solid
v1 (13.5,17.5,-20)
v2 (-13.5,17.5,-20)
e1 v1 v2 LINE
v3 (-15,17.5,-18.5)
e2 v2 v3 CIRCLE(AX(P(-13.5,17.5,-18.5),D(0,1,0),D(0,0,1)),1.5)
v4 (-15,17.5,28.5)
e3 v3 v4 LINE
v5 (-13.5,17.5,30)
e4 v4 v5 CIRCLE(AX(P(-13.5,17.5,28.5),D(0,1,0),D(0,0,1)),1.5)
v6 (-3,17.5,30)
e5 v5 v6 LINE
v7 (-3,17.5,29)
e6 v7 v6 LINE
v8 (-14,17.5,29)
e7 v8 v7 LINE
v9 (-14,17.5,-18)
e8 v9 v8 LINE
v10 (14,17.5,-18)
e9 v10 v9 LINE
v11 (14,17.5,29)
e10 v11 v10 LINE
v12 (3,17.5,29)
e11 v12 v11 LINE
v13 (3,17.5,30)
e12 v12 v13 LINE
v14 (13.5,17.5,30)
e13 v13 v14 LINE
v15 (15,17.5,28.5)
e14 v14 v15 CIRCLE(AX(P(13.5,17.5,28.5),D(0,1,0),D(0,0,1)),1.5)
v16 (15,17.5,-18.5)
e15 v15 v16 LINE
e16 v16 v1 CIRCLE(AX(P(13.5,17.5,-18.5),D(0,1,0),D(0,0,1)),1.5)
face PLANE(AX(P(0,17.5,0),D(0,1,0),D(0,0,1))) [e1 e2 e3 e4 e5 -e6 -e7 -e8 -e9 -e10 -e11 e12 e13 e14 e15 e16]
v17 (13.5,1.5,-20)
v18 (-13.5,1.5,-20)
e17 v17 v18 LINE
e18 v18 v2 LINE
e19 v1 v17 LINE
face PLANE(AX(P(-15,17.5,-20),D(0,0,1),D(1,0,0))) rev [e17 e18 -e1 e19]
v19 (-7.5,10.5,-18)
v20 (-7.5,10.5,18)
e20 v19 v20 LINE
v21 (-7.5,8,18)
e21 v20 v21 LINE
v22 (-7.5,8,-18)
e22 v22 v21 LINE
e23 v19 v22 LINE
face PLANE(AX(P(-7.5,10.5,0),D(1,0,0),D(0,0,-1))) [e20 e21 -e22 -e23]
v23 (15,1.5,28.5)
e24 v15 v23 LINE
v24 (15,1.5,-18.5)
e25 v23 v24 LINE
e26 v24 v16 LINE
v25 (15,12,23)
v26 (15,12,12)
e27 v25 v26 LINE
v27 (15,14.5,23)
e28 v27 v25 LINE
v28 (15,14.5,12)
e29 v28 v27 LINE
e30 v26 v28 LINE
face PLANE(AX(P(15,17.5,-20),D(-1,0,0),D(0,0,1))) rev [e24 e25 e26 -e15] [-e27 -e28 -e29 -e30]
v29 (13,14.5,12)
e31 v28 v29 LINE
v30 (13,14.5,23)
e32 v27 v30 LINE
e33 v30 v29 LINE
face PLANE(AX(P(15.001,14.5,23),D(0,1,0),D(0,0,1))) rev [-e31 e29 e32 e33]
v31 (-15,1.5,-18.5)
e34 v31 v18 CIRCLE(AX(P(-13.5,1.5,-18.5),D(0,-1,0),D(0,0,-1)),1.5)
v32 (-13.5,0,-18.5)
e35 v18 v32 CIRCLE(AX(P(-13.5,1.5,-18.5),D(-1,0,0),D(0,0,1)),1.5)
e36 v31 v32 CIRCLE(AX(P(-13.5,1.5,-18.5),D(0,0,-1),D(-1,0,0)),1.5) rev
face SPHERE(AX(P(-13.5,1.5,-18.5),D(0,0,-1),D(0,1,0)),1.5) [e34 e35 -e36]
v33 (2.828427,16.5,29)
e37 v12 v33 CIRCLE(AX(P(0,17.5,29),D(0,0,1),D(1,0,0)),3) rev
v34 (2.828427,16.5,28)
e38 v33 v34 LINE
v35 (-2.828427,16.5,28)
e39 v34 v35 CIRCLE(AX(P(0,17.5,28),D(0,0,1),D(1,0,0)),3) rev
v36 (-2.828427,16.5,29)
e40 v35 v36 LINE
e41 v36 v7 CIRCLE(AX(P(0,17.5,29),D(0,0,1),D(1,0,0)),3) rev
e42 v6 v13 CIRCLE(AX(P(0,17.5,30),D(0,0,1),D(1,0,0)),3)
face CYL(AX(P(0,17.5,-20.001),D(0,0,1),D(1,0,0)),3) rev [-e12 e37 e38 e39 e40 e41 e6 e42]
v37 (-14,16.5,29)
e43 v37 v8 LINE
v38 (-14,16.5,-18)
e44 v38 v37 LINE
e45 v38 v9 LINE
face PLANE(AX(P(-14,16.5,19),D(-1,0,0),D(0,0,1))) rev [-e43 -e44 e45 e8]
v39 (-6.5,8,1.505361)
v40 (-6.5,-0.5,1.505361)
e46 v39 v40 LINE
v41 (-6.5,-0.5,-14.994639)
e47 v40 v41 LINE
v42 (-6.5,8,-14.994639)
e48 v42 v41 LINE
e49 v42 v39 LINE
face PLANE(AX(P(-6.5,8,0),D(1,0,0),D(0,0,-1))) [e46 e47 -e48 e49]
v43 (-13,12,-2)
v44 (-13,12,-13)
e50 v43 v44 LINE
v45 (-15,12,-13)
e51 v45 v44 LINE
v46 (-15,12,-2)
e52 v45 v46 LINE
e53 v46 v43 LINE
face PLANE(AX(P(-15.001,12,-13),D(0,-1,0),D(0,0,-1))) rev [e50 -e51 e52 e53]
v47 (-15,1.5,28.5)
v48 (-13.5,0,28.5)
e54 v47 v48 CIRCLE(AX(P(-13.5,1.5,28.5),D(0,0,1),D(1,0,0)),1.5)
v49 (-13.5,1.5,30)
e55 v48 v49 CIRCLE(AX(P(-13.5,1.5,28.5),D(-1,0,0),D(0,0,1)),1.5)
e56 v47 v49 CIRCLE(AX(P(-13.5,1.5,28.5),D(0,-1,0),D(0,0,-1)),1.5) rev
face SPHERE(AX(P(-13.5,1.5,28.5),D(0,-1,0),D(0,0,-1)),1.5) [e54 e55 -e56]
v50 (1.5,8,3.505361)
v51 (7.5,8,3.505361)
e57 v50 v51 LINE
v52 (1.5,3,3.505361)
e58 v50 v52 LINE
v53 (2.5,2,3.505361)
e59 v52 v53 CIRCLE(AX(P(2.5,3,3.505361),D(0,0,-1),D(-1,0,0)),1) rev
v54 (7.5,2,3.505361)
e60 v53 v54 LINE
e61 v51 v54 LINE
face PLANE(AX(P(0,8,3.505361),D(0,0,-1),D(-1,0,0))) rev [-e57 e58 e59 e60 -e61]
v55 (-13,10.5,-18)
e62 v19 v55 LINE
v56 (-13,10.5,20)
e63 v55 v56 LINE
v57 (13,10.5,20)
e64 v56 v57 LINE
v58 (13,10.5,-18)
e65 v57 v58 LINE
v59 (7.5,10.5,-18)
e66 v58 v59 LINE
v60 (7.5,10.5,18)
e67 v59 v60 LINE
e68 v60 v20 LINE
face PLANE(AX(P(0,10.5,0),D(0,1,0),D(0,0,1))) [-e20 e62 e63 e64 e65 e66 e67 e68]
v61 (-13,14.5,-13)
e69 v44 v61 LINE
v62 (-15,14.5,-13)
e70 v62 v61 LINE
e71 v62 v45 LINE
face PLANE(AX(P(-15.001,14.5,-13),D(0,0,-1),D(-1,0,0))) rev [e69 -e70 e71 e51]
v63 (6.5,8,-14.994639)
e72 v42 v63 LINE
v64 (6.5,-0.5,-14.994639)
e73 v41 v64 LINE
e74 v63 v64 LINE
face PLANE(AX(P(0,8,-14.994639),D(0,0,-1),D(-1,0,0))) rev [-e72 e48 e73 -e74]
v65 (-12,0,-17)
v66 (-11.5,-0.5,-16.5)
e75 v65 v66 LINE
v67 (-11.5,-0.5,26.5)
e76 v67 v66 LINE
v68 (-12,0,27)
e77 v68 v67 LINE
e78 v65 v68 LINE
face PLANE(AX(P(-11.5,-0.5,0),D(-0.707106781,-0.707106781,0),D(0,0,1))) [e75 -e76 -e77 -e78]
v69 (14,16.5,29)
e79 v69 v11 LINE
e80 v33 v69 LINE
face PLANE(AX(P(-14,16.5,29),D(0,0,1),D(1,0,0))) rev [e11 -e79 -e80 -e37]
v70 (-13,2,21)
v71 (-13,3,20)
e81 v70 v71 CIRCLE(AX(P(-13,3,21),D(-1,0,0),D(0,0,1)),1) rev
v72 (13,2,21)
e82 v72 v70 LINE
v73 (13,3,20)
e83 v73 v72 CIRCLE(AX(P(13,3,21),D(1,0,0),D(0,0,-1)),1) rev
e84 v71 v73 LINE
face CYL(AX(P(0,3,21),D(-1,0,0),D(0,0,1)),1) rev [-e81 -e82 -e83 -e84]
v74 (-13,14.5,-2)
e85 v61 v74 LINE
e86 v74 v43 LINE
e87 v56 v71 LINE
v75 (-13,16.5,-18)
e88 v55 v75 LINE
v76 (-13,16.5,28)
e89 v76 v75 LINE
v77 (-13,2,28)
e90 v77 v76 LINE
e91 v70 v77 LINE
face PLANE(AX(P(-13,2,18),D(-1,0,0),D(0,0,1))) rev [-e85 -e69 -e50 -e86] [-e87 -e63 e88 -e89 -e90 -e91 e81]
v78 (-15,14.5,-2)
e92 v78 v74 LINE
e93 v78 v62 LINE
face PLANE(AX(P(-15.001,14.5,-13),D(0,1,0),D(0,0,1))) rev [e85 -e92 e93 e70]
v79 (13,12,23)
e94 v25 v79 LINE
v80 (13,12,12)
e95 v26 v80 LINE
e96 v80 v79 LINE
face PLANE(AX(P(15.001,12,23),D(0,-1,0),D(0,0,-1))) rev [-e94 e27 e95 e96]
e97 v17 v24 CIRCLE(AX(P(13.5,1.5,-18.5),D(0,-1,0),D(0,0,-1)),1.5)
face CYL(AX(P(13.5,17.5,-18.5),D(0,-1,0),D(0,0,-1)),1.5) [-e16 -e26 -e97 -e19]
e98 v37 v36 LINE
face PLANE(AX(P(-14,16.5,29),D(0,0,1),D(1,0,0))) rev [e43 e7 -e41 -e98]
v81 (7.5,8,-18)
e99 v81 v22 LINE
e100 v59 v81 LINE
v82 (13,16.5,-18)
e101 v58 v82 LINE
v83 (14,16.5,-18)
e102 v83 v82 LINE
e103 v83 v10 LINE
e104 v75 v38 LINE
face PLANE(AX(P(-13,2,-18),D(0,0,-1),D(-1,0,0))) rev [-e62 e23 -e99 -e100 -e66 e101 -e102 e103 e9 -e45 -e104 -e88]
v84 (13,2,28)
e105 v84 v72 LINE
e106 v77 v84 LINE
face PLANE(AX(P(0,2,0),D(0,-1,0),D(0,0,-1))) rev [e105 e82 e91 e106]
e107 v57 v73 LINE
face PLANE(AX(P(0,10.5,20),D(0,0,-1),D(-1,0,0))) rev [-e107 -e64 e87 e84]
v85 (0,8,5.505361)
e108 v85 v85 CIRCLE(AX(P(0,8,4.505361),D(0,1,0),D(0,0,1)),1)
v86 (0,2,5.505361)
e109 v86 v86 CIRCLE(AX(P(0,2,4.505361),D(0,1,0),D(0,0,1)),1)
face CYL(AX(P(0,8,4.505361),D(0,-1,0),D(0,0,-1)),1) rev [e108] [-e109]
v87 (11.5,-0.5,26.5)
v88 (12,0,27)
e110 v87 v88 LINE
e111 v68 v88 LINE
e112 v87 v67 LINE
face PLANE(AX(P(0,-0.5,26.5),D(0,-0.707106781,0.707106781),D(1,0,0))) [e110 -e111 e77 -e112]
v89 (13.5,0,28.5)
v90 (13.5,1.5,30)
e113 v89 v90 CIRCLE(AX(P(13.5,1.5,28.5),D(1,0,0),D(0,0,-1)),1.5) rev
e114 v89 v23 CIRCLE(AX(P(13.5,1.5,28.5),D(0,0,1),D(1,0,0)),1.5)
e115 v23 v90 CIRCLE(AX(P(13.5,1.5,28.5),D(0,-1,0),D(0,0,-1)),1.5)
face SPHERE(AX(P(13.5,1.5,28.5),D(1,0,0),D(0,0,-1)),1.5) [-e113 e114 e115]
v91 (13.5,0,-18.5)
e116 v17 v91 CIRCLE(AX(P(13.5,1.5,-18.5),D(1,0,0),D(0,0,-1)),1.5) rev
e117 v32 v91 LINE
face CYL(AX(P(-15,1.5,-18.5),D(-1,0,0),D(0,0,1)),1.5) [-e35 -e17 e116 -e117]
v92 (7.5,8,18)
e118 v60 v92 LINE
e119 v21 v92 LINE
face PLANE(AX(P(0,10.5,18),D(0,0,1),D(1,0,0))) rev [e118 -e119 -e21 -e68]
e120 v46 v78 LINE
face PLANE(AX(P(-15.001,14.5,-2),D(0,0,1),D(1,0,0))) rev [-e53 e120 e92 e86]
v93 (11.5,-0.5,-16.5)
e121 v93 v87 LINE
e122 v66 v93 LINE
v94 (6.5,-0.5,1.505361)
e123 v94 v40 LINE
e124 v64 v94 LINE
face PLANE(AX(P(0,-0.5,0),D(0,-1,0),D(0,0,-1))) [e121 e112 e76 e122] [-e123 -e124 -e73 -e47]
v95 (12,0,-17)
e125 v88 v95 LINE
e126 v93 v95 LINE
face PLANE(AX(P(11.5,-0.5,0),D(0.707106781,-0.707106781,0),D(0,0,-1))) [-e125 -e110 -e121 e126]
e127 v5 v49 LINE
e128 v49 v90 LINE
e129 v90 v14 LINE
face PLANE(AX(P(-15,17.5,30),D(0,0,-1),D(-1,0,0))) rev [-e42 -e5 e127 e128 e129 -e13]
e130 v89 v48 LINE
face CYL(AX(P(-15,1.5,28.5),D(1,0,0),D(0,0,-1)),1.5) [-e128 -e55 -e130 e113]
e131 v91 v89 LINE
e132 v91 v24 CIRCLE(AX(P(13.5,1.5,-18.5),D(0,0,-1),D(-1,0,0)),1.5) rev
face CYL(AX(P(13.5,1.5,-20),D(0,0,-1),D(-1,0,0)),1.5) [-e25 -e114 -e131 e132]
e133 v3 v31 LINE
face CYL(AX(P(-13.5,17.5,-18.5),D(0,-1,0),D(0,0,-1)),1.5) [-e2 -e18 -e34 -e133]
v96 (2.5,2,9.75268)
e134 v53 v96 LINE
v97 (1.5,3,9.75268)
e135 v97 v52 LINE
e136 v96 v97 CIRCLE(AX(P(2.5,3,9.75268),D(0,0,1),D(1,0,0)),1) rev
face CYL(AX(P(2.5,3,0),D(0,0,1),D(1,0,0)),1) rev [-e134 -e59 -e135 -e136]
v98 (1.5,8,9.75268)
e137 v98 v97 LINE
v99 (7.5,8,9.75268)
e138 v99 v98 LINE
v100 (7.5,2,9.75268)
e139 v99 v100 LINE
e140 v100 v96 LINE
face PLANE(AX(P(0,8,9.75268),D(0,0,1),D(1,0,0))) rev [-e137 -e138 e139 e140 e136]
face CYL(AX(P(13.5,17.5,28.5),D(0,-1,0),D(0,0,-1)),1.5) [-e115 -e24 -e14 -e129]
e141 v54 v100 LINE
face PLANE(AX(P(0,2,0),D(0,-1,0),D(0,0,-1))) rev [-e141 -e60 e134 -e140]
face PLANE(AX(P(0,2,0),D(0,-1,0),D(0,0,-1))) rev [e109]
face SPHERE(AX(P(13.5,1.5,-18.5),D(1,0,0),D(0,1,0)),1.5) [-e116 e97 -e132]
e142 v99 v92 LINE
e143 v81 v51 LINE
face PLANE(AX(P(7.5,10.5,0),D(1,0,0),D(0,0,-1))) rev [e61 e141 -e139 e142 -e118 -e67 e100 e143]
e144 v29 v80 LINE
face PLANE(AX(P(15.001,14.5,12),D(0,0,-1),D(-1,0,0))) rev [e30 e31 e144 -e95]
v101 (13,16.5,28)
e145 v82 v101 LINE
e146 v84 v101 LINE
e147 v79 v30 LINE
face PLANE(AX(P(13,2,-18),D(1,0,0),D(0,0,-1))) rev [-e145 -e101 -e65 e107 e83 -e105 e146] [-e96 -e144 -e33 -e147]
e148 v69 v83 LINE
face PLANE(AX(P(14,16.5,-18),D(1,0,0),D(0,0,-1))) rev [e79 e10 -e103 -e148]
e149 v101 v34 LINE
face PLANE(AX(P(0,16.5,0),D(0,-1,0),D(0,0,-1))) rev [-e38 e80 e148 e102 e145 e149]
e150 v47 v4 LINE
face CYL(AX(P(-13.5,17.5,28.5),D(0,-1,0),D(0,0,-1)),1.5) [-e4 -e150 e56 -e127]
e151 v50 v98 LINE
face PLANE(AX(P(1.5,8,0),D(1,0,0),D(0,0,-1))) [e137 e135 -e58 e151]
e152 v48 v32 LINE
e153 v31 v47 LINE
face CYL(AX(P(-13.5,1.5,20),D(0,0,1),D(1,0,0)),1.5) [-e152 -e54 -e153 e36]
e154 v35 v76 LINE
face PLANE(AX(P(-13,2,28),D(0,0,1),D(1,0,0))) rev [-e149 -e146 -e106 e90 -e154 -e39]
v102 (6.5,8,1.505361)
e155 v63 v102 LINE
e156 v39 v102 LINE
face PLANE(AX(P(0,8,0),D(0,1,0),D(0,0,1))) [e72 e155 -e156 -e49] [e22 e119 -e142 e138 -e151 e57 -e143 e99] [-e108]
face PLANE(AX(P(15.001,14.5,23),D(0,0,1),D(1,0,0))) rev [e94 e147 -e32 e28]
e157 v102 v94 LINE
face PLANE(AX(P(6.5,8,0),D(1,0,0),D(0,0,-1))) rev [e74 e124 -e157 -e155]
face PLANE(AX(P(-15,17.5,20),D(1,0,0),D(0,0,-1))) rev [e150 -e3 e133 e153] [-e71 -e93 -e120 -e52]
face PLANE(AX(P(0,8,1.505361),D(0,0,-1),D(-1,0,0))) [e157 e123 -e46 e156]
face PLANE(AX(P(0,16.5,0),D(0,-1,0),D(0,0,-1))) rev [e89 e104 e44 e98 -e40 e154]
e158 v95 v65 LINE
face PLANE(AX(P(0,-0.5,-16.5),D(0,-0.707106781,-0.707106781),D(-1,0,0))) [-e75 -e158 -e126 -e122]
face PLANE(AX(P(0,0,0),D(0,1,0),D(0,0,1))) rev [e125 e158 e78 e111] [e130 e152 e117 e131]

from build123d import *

# Parameters (mm, degrees)
BOSS_EXTRUDE1_DEPTH  = 17.5
CUT_EXTRUDE1_DEPTH   = 15.5
FILLET2_R            = 1.5
CUT_EXTRUDE4_REACH   = 46.612
SKETCH5_W            = 11
SKETCH5_H            = 2.5
CUT_EXTRUDE5_REACH   = 46.612
SKETCH6_W            = 11
SKETCH6_H            = 2.5
CUT_EXTRUDE6_DEPTH   = 1
BOSS_EXTRUDE7_DEPTH  = 8.5
SKETCH3_11_R         = 1
BOSS_EXTRUDE8_DEPTH  = 6
CUT_EXTRUDE8_REACH   = 38.949
SKETCH3_12_W         = 13
SKETCH3_12_H         = 16.5
BOSS_EXTRUDE9_DEPTH  = 8.5
CUT_EXTRUDE9_REACH   = 57.057
SKETCH11_W           = 25
SKETCH11_H           = 45
SKETCH11_W_2         = 13
SKETCH11_H_2         = 16.5
BOSS_EXTRUDE10_DEPTH = 0.5
CHAMFER1_SIZE        = 1
FILLET3_R            = 1


with BuildPart() as part:
    # Sketch1 → Boss-Extrude1 (new body)
    with BuildSketch(Plane(origin=(0, 0, 0), x_dir=(1, 0, 0), z_dir=(0, 1, 0))):
        Polygon((-15, 20), (15, 20), (15, -20), (15, -30), (-15, -30), (-15, -20), align=None)
    extrude(amount=BOSS_EXTRUDE1_DEPTH)

    # Sketch2 → Cut-Extrude1 (cut)
    with BuildSketch(Plane(origin=(0, 17.5, 0), x_dir=(1, 0, 0), z_dir=(0, 1, 0))):
        Polygon((-13, 18), (13, 18), (13, -18), (13, -28), (-13, -28), (-13, -18), align=None)
    extrude(amount=-CUT_EXTRUDE1_DEPTH, mode=Mode.SUBTRACT)

    # Fillet2
    fillet2_edges = [part.edges().sort_by_distance(p)[0] for p in [
        (15, 8.75, 30),
        (-15, 8.75, 30),
        (-15, 8.75, -20),
        (15, 8.75, -20),
        (0, 0, 30),
        (-15, 0, 5),
        (0, 0, -20),
        (15, 0, 5),
    ]]
    fillet(fillet2_edges, radius=FILLET2_R)

    # Sketch5 → Cut-Extrude4 (cut, up to next)
    with BuildSketch(Plane.ZY.offset(-13), mode=Mode.PRIVATE) as cut_extrude4_sk1:
        with Locations((17.5, 13.25)):
            Rectangle(SKETCH5_W, SKETCH5_H)
    cut_extrude4_tool1 = extrude(cut_extrude4_sk1.sketch, amount=-CUT_EXTRUDE4_REACH, mode=Mode.PRIVATE) & part.part
    add(cut_extrude4_tool1.solids().sort_by_distance((13, 13.25, 17.5))[0], mode=Mode.SUBTRACT)

    # Sketch6 → Cut-Extrude5 (cut, up to next)
    with BuildSketch(Plane(origin=(-13, 0, 0), x_dir=(0, 0, -1), z_dir=(1, 0, 0)), mode=Mode.PRIVATE) as cut_extrude5_sk1:
        with Locations((7.5, 13.25)):
            Rectangle(SKETCH6_W, SKETCH6_H)
    cut_extrude5_tool1 = extrude(cut_extrude5_sk1.sketch, amount=-CUT_EXTRUDE5_REACH, mode=Mode.PRIVATE) & part.part
    add(cut_extrude5_tool1.solids().sort_by_distance((-13, 13.25, -7.5))[0], mode=Mode.SUBTRACT)

    # Sketch7 → Cut-Extrude6 (cut)
    with BuildSketch(Plane(origin=(0, 17.5, 0), x_dir=(1, 0, 0), z_dir=(0, 1, 0))):
        Polygon((-13, 18), (-14, 18), (-14, -19), (-14, -29), (14, -29), (14, -19), (14, 18), (13, 18), (13, -18), (13, -28), (-13, -28), (-13, -18), align=None)
    extrude(amount=-CUT_EXTRUDE6_DEPTH, mode=Mode.SUBTRACT)

    # Sketch3 → Boss-Extrude7 (add)
    with BuildSketch(Plane(origin=(0, 2, 0), x_dir=(1, 0, 0), z_dir=(0, 1, 0))):
        Polygon((-7.5, -2.505360959), (-7.5, -1.505360959), (-7.5, 18), (-13, 18), (-13, -18), (-7.5, -18), (-7.5, -6.505360959), align=None)
        Polygon((7.5, -2.505360959), (7.5, -3.505360959), (7.5, -6.505360959), (7.5, -9.752680479), (7.5, -18), (13, -18), (13, 18), (7.5, 18), (7.5, -1.505360959), align=None)
    extrude(amount=BOSS_EXTRUDE7_DEPTH)

    # Sketch3<11> → Boss-Extrude8 (add)
    # profile 1 of 3: a face of its own
    with BuildSketch(Plane(origin=(0, 2, 0), x_dir=(1, 0, 0), z_dir=(0, 1, 0))):
        Polygon((1.5, -1.505360959), (-6.5, -1.505360959), (-7.5, -1.505360959), (-7.5, -2.505360959), (-7.5, -6.505360959), (-7.5, -18), (-1.5, -18), (1.5, -18), (7.5, -18), (7.5, -9.752680479), (1.5, -9.752680479), (1.5, -3.505360959), align=None)
        with Locations(Location((0, -4.505360959, 0), (0, 0, 270))):
            Circle(SKETCH3_11_R, mode=Mode.SUBTRACT)
    # profile 2 of 3: a face of its own
    with BuildSketch(Plane(origin=(0, 2, 0), x_dir=(1, 0, 0), z_dir=(0, 1, 0))):
        Polygon((-7.5, -1.505360959), (-6.5, -1.505360959), (-6.5, 14.994639041), (6.5, 14.994639041), (6.5, -1.505360959), (7.5, -1.505360959), (7.5, 18), (-7.5, 18), align=None)
    # profile 3 of 3: a face of its own
    with BuildSketch(Plane(origin=(0, 2, 0), x_dir=(1, 0, 0), z_dir=(0, 1, 0))):
        Polygon((6.214337826, -1.505360959), (1.5, -1.505360959), (1.5, -3.505360959), (7.5, -3.505360959), (7.5, -2.505360959), (7.5, -1.505360959), (6.5, -1.505360959), align=None)
    extrude(amount=BOSS_EXTRUDE8_DEPTH)

    # Sketch3<12> → Cut-Extrude8 (cut, up to next)
    with BuildSketch(Plane(origin=(0, 2, 0), x_dir=(1, 0, 0), z_dir=(0, 1, 0)), mode=Mode.PRIVATE) as cut_extrude8_sk1:
        with Locations((0, 6.744639041)):
            Rectangle(SKETCH3_12_W, SKETCH3_12_H)
    cut_extrude8_tool1 = extrude(cut_extrude8_sk1.sketch, amount=-CUT_EXTRUDE8_REACH, mode=Mode.PRIVATE) & part.part
    add(cut_extrude8_tool1.solids().sort_by_distance((0, 2, -6.744639))[0], mode=Mode.SUBTRACT)

    # Sketch3<13> → Boss-Extrude9 (add)
    with BuildSketch(Plane(origin=(0, 2, 0), x_dir=(1, 0, 0), z_dir=(0, 1, 0))):
        Polygon((-7.5, -18), (-13, -18), (-13, -20), (13, -20), (13, -18), (7.5, -18), (1.5, -18), (-1.5, -18), align=None)
    extrude(amount=BOSS_EXTRUDE9_DEPTH)

    # Sketch10 → Cut-Extrude9 (cut, up to next)
    with BuildSketch(Plane.XY.offset(30), mode=Mode.PRIVATE) as cut_extrude9_sk1:
        with BuildLine():
            Line((-3, 17.5), (3, 17.5))
            ThreePointArc((3, 17.5), (0, 14.5), (-3, 17.5))
        make_face()
    cut_extrude9_tool1 = extrude(cut_extrude9_sk1.sketch, amount=-CUT_EXTRUDE9_REACH, mode=Mode.PRIVATE) & part.part
    add(cut_extrude9_tool1.solids().sort_by_distance((0, 16.22676, 30))[0], mode=Mode.SUBTRACT)

    # Sketch11 → Boss-Extrude10 (add)
    with BuildSketch(Plane.XZ):
        with Locations((0, 5)):
            Rectangle(SKETCH11_W, SKETCH11_H)
        with Locations((0, -6.744639041)):
            Rectangle(SKETCH11_W_2, SKETCH11_H_2, mode=Mode.SUBTRACT)
    extrude(amount=BOSS_EXTRUDE10_DEPTH)

    # Chamfer1
    # the kernel refuses this chamfer: 1 mm, written as the material it takes off along each edge
    with BuildSketch(Plane(origin=(-15.071682988, -0.5, 27.5), x_dir=(0, -0.027495876610586403, -0.9996219169112968), z_dir=(1, 0, 0))) as chamfer1_piece_1_section:
        Polygon((CHAMFER1_SIZE * 0.999621916911, CHAMFER1_SIZE * 0.0274958766106), (-CHAMFER1_SIZE * 0.0274958766106, CHAMFER1_SIZE * 0.999621916911), (0, 0), align=None)
    chamfer1_piece_1 = extrude(amount=30.143365976, mode=Mode.PRIVATE)
    chamfer1_piece_1 = split(chamfer1_piece_1, bisect_by=Plane(origin=(0, 0, 27.106598916), z_dir=(0, -1, 0)), keep=Keep.TOP, mode=Mode.PRIVATE)
    add(chamfer1_piece_1, mode=Mode.SUBTRACT)
    with BuildSketch(Plane(origin=(-12.5, -0.5, -20.071682988), x_dir=(0.9996219169112968, -0.027495876610586403, 0), z_dir=(0, 0, 1))) as chamfer1_piece_2_section:
        Polygon((CHAMFER1_SIZE * 0.999621916911, CHAMFER1_SIZE * 0.0274958766106), (-CHAMFER1_SIZE * 0.0274958766106, CHAMFER1_SIZE * 0.999621916911), (0, 0), align=None)
    chamfer1_piece_2 = extrude(amount=50.143365976, mode=Mode.PRIVATE)
    chamfer1_piece_2 = split(chamfer1_piece_2, bisect_by=Plane(origin=(-12.106598916, 0, 5), z_dir=(0, -1, 0)), keep=Keep.TOP, mode=Mode.PRIVATE)
    add(chamfer1_piece_2, mode=Mode.SUBTRACT)
    with BuildSketch(Plane(origin=(12.5, -0.5, 30.071682988), x_dir=(-0.9996219169112968, -0.027495876610586403, 0), z_dir=(0, 0, -1))) as chamfer1_piece_3_section:
        Polygon((CHAMFER1_SIZE * 0.999621916911, CHAMFER1_SIZE * 0.0274958766106), (-CHAMFER1_SIZE * 0.0274958766106, CHAMFER1_SIZE * 0.999621916911), (0, 0), align=None)
    chamfer1_piece_3 = extrude(amount=50.143365976, mode=Mode.PRIVATE)
    chamfer1_piece_3 = split(chamfer1_piece_3, bisect_by=Plane(origin=(12.106598916, 0, 5), z_dir=(0, -1, 0)), keep=Keep.TOP, mode=Mode.PRIVATE)
    add(chamfer1_piece_3, mode=Mode.SUBTRACT)
    with BuildSketch(Plane(origin=(15.071682988, -0.5, -17.5), x_dir=(0, -0.027495876610586403, 0.9996219169112968), z_dir=(-1, 0, 0))) as chamfer1_piece_4_section:
        Polygon((CHAMFER1_SIZE * 0.999621916911, CHAMFER1_SIZE * 0.0274958766106), (-CHAMFER1_SIZE * 0.0274958766106, CHAMFER1_SIZE * 0.999621916911), (0, 0), align=None)
    chamfer1_piece_4 = extrude(amount=30.143365976, mode=Mode.PRIVATE)
    chamfer1_piece_4 = split(chamfer1_piece_4, bisect_by=Plane(origin=(0, 0, -17.106598916), z_dir=(0, -1, 0)), keep=Keep.TOP, mode=Mode.PRIVATE)
    add(chamfer1_piece_4, mode=Mode.SUBTRACT)

    # Fillet3
    fillet3_edges = [part.edges().sort_by_distance(p)[0] for p in [
        (1.5, 2, 6.629020719),
        (0, 2, 20),
    ]]
    fillet(fillet3_edges, radius=FILLET3_R)


solid = part.part
